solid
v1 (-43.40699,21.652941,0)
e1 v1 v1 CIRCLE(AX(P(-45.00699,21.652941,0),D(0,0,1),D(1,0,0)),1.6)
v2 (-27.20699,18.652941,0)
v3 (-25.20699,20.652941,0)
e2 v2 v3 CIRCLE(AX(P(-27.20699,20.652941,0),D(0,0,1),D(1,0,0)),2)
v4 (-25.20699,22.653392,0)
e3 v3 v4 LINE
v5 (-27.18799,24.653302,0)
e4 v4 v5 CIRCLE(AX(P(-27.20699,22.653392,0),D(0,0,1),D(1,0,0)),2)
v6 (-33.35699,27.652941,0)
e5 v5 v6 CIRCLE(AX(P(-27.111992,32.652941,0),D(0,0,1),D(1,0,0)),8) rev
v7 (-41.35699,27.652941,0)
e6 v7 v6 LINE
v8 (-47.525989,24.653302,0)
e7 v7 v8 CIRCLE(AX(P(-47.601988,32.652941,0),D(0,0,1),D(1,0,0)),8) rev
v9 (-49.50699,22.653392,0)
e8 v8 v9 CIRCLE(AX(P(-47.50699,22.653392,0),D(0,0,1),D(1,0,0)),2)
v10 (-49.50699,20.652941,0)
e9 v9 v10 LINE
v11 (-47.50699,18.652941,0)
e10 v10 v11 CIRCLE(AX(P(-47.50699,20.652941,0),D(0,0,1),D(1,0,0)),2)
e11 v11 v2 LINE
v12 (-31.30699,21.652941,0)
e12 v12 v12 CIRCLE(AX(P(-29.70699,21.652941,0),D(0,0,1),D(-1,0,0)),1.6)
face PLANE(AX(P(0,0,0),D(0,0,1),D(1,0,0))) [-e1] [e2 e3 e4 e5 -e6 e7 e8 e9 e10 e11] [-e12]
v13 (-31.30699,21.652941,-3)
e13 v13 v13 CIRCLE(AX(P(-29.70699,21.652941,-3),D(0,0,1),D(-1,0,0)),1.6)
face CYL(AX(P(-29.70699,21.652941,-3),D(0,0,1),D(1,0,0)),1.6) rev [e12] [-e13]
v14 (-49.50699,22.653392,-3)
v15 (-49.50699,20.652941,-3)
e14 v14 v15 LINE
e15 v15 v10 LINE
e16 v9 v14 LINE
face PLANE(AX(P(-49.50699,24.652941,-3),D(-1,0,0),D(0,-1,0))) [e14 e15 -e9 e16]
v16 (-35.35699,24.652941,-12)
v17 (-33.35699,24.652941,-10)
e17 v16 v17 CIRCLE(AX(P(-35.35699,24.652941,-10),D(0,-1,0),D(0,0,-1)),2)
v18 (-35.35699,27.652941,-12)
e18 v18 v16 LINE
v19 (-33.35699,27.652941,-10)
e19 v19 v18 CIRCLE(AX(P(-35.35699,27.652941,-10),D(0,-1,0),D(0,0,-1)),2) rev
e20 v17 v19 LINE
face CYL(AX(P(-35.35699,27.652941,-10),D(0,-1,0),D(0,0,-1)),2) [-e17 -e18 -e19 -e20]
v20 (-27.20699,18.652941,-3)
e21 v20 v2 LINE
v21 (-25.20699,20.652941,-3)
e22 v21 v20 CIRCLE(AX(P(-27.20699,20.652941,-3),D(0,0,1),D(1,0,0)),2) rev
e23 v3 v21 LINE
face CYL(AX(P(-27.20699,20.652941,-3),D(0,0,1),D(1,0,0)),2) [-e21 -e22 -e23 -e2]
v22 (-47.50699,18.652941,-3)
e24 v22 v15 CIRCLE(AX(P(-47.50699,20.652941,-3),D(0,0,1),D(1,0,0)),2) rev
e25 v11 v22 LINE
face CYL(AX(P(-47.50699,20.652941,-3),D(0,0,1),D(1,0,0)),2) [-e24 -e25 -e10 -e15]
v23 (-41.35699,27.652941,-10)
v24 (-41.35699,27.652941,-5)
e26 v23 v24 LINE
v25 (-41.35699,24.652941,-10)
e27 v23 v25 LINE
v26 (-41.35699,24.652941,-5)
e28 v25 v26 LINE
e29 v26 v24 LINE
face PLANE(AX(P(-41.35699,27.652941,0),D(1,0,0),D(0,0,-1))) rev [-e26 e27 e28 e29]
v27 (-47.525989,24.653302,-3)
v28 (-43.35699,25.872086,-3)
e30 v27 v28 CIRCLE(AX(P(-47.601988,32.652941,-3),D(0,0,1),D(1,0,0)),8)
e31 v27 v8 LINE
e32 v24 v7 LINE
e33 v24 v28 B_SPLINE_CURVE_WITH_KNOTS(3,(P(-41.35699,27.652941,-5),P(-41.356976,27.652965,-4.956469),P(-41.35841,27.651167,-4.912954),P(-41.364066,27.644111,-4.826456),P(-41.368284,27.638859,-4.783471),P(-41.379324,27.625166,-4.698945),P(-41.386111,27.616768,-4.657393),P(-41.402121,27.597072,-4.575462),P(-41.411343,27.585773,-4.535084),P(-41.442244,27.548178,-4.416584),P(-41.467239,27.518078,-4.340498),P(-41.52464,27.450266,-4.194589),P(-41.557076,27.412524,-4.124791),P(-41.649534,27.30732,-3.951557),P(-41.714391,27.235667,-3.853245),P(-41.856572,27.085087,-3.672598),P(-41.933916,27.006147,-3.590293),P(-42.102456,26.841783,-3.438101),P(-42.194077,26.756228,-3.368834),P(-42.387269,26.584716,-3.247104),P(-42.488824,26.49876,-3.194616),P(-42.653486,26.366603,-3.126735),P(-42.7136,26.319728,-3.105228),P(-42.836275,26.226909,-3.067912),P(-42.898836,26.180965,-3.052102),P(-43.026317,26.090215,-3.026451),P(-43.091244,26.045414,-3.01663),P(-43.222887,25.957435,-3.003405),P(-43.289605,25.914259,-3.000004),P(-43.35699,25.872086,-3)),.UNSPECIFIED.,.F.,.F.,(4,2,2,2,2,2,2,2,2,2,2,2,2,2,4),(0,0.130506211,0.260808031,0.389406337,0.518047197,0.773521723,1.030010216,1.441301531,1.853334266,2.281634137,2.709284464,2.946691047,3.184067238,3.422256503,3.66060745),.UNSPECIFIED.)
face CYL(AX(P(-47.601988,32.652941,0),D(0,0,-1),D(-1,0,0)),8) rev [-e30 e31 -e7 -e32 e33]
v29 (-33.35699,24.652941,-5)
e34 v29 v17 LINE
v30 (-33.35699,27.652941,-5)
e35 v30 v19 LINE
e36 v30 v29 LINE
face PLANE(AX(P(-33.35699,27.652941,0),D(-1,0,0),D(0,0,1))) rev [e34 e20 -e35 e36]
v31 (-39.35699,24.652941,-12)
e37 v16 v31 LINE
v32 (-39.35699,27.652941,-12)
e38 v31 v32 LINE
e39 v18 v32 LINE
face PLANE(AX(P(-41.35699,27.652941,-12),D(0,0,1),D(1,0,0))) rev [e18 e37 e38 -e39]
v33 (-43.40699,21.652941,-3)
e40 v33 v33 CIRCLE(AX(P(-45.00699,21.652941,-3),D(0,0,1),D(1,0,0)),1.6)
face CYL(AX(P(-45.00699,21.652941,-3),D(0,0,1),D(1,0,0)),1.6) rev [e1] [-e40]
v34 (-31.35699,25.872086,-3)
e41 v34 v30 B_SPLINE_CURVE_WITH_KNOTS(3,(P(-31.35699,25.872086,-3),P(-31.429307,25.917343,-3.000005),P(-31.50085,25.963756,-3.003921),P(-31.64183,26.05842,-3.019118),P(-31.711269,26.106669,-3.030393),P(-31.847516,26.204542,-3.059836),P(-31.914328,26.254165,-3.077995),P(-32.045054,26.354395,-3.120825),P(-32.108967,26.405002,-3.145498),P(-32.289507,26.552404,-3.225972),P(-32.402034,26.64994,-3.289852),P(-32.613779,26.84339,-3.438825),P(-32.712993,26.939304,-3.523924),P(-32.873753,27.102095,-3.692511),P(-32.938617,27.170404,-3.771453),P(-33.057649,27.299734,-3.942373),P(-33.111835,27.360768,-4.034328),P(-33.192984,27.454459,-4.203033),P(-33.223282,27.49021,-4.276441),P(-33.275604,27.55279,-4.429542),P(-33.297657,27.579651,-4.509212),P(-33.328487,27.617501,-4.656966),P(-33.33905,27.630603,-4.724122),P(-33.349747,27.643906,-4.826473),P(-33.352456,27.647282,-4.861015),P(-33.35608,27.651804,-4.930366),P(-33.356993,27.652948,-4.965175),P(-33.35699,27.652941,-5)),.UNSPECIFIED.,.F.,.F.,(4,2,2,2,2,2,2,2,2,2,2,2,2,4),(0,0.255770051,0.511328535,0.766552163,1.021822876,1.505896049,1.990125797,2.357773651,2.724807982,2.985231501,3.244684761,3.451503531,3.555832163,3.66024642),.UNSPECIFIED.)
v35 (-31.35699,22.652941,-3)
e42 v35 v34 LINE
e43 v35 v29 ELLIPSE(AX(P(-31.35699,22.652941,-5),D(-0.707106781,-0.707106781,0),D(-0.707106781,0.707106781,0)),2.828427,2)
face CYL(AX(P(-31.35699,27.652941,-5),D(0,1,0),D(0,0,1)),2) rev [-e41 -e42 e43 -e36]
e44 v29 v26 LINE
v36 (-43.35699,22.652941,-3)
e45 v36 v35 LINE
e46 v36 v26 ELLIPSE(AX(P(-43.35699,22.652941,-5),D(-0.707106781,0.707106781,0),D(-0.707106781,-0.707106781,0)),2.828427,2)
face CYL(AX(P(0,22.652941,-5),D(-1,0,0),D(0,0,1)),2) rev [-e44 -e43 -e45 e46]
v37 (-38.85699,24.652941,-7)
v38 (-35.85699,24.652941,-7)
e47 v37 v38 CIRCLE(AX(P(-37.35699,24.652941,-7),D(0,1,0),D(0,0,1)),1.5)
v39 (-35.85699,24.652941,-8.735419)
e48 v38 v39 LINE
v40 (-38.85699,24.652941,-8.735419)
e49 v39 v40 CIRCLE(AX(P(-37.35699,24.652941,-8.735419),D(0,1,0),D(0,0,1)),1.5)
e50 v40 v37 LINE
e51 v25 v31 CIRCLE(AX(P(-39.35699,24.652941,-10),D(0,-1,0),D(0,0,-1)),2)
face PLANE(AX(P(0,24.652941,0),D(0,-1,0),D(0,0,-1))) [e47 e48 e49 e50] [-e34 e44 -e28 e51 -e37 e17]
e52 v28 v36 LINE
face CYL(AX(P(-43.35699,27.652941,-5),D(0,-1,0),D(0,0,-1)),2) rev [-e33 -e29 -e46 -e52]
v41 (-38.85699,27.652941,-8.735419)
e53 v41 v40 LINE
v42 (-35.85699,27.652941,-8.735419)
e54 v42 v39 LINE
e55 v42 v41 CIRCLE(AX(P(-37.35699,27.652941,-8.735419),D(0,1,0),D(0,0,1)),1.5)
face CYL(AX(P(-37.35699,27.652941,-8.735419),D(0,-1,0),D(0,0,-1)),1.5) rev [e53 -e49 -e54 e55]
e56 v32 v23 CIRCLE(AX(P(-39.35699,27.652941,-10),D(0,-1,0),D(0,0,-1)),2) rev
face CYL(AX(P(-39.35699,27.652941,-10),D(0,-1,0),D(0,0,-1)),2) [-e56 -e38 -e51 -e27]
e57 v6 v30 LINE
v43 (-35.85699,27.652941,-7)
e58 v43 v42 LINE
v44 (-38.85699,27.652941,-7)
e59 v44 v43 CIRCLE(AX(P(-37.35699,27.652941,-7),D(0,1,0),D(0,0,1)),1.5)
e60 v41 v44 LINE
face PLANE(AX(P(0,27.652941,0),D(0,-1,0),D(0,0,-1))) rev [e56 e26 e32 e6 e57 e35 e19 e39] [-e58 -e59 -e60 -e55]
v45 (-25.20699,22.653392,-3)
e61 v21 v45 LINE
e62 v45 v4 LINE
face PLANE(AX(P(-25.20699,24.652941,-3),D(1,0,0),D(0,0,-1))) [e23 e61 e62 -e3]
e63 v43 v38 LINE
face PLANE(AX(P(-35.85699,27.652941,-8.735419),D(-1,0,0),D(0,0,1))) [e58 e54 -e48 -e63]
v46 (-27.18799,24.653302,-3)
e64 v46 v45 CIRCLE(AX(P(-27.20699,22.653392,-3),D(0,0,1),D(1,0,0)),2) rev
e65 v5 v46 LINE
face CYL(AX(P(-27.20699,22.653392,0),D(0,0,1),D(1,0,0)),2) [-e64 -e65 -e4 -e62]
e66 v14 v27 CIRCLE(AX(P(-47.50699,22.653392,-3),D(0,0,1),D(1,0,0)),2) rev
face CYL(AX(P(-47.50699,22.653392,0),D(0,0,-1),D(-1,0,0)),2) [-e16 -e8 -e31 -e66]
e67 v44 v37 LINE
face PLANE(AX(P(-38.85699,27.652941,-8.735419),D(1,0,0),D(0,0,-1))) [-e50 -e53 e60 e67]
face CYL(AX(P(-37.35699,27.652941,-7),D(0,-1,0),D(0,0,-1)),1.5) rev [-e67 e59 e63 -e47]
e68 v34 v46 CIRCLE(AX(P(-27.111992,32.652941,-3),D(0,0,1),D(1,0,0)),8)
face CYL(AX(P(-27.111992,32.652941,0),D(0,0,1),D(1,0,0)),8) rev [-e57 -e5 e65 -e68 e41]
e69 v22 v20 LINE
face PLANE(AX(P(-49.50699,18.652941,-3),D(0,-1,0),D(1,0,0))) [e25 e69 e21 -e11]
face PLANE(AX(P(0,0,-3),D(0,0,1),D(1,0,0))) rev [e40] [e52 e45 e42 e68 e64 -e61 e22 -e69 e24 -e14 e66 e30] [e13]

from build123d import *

# Parameters (mm, degrees)
ESBO_O1_W                = 24.3
ESBO_O1_H                = 6
ESBO_O1_R                = 1.6
FLANGE_BASE1_DEPTH       = 3
ESBO_O6_W                = 8
ESBO_O6_H                = 12
RESSALTO_EXTRUS_O1_DEPTH = 3
FILETE1_R                = 8
FILETE2_R                = 2


# Sheet-metal steps are written as plain solids
with BuildPart() as part:
    # Esboço1 → Flange-base1 (new body)
    with BuildSketch(Plane.XY):
        with Locations((-37.35698959, 21.652941176)):
            Rectangle(ESBO_O1_W, ESBO_O1_H)
        with Locations((-45.00698959, 21.652941176)):
            Circle(ESBO_O1_R, mode=Mode.SUBTRACT)
        with Locations(Location((-29.70698959, 21.652941176, 0), (0, 0, 180))):
            Circle(ESBO_O1_R, mode=Mode.SUBTRACT)
    extrude(amount=-FLANGE_BASE1_DEPTH)

    # Esboço6 → Ressalto-extrusão1 (add)
    with BuildSketch(Plane(origin=(0, 24.652941176, 0), x_dir=(1, 0, 0), z_dir=(0, 1, 0))):
        with Locations((-37.35698959, 6)):
            Rectangle(ESBO_O6_W, ESBO_O6_H)
        with BuildLine():
            Line((-35.85698959, 8.735419394), (-35.85698959, 7))
            ThreePointArc((-35.85698959, 7), (-37.35698959, 5.5), (-38.85698959, 7))
            Line((-38.85698959, 7), (-38.85698959, 8.735419394))
            ThreePointArc((-38.85698959, 8.735419394), (-37.35698959, 10.235419394), (-35.85698959, 8.735419394))
        make_face(mode=Mode.SUBTRACT)
    extrude(amount=RESSALTO_EXTRUS_O1_DEPTH)

    # Filete1
    # the kernel refuses this fillet: 8 mm, written as the material it adds along each edge
    with BuildSketch(Plane(origin=(-33.35698959, 24.652941176, 0), x_dir=(1, 0, 0), z_dir=(0, 0, -1)), Plane(origin=(-41.35698959, 24.652941176, -3), x_dir=(-1, 0, 0), z_dir=(0, 0, 1))) as filete1_piece_1:
        with BuildLine():
            CenterArc((6.244997998, -8), FILETE1_R, 90, 51.317812547)
            Line((0, -3), (0, 0))
            Line((0, 0), (6.244997998, 0))
        make_face()
    extrude(amount=3)

    # Filete2
    filete2_edges = [part.edges().sort_by_distance(p)[0] for p in [
        (-33.35698959, 26.152941176, -3),
        (-41.35698959, 26.152941176, -3),
        (-41.35698959, 26.152941176, -12),
        (-33.35698959, 26.152941176, -12),
        (-25.20698959, 24.652941176, -1.5),
        (-25.20698959, 18.652941176, -1.5),
        (-49.50698959, 24.652941176, -1.5),
        (-49.50698959, 18.652941176, -1.5),
        (-37.35698959, 24.652941176, -3),
    ]]
    fillet(filete2_edges, radius=FILETE2_R)


solid = part.part
